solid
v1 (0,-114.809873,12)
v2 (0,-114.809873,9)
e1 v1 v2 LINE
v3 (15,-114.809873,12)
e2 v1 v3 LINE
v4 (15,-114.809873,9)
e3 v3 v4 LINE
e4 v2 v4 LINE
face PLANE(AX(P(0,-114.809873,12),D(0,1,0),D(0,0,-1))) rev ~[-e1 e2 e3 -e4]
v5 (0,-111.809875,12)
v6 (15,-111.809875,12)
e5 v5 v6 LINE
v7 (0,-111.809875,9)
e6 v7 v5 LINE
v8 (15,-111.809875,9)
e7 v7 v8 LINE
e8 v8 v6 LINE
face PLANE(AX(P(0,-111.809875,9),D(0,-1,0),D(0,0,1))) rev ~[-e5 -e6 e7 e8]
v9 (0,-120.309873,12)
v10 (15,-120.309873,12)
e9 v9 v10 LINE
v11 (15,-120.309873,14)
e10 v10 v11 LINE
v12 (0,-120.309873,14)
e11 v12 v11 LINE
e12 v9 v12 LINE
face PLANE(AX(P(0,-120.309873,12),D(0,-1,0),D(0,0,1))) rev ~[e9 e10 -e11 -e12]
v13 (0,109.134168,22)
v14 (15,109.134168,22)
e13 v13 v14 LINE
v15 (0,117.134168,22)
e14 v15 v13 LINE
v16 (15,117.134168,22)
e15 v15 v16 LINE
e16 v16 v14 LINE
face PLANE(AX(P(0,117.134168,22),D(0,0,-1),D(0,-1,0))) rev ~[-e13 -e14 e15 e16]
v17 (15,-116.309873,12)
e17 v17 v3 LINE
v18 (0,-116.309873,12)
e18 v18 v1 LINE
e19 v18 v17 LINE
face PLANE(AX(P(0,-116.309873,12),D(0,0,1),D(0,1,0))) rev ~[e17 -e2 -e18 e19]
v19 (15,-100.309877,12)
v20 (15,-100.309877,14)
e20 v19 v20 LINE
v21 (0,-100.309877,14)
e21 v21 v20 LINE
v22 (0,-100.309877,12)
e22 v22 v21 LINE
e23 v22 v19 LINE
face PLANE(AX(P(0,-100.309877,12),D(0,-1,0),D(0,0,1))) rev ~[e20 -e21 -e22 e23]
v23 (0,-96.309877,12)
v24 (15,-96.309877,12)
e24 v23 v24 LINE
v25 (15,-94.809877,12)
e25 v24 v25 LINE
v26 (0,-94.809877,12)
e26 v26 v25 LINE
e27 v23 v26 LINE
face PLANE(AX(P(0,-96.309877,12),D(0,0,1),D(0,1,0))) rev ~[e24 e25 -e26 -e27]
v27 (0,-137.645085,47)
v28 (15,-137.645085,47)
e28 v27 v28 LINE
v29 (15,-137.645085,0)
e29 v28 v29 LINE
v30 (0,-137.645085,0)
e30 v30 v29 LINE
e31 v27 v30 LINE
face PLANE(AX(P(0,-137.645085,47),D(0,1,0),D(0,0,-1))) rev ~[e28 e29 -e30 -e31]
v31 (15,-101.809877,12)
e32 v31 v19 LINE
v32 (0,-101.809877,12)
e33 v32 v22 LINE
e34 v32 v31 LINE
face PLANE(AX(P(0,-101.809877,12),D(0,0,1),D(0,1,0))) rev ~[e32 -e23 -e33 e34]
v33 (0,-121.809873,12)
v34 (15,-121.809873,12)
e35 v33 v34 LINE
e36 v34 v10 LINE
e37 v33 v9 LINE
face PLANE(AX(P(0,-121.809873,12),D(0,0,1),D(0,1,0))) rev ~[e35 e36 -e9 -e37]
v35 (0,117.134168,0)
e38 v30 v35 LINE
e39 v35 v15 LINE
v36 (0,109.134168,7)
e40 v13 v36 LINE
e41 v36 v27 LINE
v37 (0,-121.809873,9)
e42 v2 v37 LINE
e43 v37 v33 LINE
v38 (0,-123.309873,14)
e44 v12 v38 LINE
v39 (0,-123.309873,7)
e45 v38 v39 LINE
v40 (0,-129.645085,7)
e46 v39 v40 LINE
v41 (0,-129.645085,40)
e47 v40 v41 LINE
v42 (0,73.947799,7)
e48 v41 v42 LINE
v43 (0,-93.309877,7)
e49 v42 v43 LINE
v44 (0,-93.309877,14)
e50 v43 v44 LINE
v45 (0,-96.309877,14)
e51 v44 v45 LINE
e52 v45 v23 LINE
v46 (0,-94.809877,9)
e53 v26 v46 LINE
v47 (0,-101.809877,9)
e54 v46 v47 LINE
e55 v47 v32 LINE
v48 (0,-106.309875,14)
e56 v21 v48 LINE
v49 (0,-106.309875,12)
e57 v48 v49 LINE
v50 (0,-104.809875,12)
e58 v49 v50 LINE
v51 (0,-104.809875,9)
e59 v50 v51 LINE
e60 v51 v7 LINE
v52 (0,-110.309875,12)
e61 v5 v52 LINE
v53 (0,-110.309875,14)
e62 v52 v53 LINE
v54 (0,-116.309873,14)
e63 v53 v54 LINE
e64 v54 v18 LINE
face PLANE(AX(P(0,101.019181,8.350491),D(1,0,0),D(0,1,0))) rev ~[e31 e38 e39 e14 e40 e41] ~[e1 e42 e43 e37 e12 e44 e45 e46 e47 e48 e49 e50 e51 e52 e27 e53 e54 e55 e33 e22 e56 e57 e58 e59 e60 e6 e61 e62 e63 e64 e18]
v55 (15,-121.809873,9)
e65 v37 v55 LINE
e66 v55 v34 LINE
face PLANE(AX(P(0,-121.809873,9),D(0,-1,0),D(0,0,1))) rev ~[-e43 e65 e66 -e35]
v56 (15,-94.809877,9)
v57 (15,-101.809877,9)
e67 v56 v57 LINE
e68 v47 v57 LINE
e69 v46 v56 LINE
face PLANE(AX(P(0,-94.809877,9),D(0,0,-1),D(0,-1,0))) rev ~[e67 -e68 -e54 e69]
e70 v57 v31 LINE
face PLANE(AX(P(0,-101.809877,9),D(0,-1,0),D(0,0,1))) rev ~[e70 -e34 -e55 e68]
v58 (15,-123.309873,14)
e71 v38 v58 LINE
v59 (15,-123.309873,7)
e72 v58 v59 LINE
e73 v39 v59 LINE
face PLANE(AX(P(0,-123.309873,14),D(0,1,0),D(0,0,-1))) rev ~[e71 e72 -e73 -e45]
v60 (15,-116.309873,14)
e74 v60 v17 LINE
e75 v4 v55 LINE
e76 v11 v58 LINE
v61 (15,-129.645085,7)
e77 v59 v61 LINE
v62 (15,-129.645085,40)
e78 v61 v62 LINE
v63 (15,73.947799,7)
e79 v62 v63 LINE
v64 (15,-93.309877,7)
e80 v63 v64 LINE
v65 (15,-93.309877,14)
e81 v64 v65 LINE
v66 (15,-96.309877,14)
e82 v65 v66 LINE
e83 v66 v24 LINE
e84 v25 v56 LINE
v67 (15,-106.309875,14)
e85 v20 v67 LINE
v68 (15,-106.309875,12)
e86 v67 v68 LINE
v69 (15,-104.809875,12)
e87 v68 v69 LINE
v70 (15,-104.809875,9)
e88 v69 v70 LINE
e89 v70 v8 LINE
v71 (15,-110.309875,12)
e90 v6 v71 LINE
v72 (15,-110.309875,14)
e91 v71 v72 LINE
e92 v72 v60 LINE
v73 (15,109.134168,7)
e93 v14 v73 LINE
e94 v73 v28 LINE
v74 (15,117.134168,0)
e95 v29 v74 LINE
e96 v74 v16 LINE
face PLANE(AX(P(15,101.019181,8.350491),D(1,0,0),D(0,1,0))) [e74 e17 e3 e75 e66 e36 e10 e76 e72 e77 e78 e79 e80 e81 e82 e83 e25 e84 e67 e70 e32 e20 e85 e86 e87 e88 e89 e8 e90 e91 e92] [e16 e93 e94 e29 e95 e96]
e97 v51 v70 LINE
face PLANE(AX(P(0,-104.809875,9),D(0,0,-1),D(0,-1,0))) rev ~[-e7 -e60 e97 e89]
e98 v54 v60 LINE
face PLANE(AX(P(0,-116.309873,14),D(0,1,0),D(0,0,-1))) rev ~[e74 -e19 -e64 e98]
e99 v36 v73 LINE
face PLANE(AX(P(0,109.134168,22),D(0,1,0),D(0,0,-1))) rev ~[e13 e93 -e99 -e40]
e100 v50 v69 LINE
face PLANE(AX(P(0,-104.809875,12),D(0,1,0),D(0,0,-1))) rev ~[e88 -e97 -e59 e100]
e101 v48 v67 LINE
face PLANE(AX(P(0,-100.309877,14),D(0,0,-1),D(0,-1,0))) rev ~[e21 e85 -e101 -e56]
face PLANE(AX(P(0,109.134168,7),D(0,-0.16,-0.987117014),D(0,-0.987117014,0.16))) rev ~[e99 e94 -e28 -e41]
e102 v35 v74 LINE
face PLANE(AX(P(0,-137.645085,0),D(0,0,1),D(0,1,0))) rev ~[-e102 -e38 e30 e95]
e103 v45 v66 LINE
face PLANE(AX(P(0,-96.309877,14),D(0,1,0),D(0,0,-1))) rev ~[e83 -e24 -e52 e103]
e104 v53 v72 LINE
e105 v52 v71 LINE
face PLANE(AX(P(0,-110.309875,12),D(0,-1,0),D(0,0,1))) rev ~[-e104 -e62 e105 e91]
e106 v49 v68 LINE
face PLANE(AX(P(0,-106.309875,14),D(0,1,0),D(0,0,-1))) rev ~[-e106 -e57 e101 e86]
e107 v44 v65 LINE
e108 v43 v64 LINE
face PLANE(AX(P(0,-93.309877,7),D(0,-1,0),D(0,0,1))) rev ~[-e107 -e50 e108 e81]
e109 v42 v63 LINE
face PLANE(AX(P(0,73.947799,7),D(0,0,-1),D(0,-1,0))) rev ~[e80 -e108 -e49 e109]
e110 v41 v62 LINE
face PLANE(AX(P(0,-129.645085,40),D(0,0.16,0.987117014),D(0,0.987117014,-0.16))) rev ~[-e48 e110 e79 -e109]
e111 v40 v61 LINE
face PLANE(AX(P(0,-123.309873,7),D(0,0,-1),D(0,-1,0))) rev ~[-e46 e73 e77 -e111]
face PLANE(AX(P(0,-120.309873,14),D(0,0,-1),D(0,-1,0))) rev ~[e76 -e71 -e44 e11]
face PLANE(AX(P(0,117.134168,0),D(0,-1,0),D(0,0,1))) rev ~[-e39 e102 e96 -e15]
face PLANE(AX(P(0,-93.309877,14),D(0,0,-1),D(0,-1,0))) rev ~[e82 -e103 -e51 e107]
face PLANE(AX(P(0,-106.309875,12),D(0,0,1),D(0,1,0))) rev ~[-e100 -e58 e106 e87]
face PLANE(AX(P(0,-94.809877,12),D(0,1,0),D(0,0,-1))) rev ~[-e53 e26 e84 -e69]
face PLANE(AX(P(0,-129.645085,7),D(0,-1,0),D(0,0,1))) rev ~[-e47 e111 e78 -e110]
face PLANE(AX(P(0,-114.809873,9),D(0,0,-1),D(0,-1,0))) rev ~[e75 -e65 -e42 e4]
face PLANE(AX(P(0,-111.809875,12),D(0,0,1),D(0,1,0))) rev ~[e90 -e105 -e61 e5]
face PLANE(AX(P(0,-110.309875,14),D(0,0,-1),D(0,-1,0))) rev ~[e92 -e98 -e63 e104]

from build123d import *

# Parameters (mm, degrees)
F1_DEPTH = 15


# Not quite as in the source:
# - ends of sketch curves that miss each other by under 0.0002 mm in the source are joined


with BuildPart() as f1:
    # F0 (on Right) → F1 (new body)
    with BuildSketch(Plane.YZ):
        Polygon((73.9477990592, 7), (117.1341684366, 0), (117.1341684366, 22), (109.1341684366, 22), (109.1341684366, 7), align=None)
        Polygon((-129.6450851485, 0), (117.1341684366, 0), (73.9477990592, 7), (-93.3098772168, 7), (-103.3098761737, 7), (-113.3098740876, 7), (-123.3098730445, 7), (-129.6450851485, 7), align=None)
        Polygon((-129.6450851485, 40), (73.9477990592, 7), (109.1341684366, 7), (-137.6450851485, 47), (-137.6450851485, 0), (-129.6450851485, 0), (-129.6450851485, 7), align=None)
        Polygon((-123.3098730445, 14), (-123.3098730445, 7), (-113.3098740876, 7), (-113.3098730445, 14), (-116.3098730445, 14), (-116.3098730445, 12), (-114.8098730445, 12), (-114.8098730445, 9), (-121.8098730445, 9), (-121.8098730445, 12), (-120.3098730445, 12), (-120.3098730445, 14), align=None)
        Polygon((-113.3098740876, 7), (-103.3098761737, 7), (-103.3098751307, 14), (-106.3098751307, 14), (-106.3098751307, 12), (-104.8098751307, 12), (-104.8098751307, 9), (-111.8098751307, 9), (-111.8098751307, 12), (-110.3098751307, 12), (-110.3098751307, 14), (-113.3098751307, 14), align=None)
        Polygon((-103.3098761737, 7), (-93.3098772168, 7), (-93.3098772168, 14), (-96.3098772168, 14), (-96.3098772168, 12), (-94.8098772168, 12), (-94.8098772168, 9), (-101.8098772168, 9), (-101.8098772168, 12), (-100.3098772168, 12), (-100.3098772168, 14), (-103.3098772168, 14), align=None)
    extrude(amount=F1_DEPTH)


solid = f1.part
